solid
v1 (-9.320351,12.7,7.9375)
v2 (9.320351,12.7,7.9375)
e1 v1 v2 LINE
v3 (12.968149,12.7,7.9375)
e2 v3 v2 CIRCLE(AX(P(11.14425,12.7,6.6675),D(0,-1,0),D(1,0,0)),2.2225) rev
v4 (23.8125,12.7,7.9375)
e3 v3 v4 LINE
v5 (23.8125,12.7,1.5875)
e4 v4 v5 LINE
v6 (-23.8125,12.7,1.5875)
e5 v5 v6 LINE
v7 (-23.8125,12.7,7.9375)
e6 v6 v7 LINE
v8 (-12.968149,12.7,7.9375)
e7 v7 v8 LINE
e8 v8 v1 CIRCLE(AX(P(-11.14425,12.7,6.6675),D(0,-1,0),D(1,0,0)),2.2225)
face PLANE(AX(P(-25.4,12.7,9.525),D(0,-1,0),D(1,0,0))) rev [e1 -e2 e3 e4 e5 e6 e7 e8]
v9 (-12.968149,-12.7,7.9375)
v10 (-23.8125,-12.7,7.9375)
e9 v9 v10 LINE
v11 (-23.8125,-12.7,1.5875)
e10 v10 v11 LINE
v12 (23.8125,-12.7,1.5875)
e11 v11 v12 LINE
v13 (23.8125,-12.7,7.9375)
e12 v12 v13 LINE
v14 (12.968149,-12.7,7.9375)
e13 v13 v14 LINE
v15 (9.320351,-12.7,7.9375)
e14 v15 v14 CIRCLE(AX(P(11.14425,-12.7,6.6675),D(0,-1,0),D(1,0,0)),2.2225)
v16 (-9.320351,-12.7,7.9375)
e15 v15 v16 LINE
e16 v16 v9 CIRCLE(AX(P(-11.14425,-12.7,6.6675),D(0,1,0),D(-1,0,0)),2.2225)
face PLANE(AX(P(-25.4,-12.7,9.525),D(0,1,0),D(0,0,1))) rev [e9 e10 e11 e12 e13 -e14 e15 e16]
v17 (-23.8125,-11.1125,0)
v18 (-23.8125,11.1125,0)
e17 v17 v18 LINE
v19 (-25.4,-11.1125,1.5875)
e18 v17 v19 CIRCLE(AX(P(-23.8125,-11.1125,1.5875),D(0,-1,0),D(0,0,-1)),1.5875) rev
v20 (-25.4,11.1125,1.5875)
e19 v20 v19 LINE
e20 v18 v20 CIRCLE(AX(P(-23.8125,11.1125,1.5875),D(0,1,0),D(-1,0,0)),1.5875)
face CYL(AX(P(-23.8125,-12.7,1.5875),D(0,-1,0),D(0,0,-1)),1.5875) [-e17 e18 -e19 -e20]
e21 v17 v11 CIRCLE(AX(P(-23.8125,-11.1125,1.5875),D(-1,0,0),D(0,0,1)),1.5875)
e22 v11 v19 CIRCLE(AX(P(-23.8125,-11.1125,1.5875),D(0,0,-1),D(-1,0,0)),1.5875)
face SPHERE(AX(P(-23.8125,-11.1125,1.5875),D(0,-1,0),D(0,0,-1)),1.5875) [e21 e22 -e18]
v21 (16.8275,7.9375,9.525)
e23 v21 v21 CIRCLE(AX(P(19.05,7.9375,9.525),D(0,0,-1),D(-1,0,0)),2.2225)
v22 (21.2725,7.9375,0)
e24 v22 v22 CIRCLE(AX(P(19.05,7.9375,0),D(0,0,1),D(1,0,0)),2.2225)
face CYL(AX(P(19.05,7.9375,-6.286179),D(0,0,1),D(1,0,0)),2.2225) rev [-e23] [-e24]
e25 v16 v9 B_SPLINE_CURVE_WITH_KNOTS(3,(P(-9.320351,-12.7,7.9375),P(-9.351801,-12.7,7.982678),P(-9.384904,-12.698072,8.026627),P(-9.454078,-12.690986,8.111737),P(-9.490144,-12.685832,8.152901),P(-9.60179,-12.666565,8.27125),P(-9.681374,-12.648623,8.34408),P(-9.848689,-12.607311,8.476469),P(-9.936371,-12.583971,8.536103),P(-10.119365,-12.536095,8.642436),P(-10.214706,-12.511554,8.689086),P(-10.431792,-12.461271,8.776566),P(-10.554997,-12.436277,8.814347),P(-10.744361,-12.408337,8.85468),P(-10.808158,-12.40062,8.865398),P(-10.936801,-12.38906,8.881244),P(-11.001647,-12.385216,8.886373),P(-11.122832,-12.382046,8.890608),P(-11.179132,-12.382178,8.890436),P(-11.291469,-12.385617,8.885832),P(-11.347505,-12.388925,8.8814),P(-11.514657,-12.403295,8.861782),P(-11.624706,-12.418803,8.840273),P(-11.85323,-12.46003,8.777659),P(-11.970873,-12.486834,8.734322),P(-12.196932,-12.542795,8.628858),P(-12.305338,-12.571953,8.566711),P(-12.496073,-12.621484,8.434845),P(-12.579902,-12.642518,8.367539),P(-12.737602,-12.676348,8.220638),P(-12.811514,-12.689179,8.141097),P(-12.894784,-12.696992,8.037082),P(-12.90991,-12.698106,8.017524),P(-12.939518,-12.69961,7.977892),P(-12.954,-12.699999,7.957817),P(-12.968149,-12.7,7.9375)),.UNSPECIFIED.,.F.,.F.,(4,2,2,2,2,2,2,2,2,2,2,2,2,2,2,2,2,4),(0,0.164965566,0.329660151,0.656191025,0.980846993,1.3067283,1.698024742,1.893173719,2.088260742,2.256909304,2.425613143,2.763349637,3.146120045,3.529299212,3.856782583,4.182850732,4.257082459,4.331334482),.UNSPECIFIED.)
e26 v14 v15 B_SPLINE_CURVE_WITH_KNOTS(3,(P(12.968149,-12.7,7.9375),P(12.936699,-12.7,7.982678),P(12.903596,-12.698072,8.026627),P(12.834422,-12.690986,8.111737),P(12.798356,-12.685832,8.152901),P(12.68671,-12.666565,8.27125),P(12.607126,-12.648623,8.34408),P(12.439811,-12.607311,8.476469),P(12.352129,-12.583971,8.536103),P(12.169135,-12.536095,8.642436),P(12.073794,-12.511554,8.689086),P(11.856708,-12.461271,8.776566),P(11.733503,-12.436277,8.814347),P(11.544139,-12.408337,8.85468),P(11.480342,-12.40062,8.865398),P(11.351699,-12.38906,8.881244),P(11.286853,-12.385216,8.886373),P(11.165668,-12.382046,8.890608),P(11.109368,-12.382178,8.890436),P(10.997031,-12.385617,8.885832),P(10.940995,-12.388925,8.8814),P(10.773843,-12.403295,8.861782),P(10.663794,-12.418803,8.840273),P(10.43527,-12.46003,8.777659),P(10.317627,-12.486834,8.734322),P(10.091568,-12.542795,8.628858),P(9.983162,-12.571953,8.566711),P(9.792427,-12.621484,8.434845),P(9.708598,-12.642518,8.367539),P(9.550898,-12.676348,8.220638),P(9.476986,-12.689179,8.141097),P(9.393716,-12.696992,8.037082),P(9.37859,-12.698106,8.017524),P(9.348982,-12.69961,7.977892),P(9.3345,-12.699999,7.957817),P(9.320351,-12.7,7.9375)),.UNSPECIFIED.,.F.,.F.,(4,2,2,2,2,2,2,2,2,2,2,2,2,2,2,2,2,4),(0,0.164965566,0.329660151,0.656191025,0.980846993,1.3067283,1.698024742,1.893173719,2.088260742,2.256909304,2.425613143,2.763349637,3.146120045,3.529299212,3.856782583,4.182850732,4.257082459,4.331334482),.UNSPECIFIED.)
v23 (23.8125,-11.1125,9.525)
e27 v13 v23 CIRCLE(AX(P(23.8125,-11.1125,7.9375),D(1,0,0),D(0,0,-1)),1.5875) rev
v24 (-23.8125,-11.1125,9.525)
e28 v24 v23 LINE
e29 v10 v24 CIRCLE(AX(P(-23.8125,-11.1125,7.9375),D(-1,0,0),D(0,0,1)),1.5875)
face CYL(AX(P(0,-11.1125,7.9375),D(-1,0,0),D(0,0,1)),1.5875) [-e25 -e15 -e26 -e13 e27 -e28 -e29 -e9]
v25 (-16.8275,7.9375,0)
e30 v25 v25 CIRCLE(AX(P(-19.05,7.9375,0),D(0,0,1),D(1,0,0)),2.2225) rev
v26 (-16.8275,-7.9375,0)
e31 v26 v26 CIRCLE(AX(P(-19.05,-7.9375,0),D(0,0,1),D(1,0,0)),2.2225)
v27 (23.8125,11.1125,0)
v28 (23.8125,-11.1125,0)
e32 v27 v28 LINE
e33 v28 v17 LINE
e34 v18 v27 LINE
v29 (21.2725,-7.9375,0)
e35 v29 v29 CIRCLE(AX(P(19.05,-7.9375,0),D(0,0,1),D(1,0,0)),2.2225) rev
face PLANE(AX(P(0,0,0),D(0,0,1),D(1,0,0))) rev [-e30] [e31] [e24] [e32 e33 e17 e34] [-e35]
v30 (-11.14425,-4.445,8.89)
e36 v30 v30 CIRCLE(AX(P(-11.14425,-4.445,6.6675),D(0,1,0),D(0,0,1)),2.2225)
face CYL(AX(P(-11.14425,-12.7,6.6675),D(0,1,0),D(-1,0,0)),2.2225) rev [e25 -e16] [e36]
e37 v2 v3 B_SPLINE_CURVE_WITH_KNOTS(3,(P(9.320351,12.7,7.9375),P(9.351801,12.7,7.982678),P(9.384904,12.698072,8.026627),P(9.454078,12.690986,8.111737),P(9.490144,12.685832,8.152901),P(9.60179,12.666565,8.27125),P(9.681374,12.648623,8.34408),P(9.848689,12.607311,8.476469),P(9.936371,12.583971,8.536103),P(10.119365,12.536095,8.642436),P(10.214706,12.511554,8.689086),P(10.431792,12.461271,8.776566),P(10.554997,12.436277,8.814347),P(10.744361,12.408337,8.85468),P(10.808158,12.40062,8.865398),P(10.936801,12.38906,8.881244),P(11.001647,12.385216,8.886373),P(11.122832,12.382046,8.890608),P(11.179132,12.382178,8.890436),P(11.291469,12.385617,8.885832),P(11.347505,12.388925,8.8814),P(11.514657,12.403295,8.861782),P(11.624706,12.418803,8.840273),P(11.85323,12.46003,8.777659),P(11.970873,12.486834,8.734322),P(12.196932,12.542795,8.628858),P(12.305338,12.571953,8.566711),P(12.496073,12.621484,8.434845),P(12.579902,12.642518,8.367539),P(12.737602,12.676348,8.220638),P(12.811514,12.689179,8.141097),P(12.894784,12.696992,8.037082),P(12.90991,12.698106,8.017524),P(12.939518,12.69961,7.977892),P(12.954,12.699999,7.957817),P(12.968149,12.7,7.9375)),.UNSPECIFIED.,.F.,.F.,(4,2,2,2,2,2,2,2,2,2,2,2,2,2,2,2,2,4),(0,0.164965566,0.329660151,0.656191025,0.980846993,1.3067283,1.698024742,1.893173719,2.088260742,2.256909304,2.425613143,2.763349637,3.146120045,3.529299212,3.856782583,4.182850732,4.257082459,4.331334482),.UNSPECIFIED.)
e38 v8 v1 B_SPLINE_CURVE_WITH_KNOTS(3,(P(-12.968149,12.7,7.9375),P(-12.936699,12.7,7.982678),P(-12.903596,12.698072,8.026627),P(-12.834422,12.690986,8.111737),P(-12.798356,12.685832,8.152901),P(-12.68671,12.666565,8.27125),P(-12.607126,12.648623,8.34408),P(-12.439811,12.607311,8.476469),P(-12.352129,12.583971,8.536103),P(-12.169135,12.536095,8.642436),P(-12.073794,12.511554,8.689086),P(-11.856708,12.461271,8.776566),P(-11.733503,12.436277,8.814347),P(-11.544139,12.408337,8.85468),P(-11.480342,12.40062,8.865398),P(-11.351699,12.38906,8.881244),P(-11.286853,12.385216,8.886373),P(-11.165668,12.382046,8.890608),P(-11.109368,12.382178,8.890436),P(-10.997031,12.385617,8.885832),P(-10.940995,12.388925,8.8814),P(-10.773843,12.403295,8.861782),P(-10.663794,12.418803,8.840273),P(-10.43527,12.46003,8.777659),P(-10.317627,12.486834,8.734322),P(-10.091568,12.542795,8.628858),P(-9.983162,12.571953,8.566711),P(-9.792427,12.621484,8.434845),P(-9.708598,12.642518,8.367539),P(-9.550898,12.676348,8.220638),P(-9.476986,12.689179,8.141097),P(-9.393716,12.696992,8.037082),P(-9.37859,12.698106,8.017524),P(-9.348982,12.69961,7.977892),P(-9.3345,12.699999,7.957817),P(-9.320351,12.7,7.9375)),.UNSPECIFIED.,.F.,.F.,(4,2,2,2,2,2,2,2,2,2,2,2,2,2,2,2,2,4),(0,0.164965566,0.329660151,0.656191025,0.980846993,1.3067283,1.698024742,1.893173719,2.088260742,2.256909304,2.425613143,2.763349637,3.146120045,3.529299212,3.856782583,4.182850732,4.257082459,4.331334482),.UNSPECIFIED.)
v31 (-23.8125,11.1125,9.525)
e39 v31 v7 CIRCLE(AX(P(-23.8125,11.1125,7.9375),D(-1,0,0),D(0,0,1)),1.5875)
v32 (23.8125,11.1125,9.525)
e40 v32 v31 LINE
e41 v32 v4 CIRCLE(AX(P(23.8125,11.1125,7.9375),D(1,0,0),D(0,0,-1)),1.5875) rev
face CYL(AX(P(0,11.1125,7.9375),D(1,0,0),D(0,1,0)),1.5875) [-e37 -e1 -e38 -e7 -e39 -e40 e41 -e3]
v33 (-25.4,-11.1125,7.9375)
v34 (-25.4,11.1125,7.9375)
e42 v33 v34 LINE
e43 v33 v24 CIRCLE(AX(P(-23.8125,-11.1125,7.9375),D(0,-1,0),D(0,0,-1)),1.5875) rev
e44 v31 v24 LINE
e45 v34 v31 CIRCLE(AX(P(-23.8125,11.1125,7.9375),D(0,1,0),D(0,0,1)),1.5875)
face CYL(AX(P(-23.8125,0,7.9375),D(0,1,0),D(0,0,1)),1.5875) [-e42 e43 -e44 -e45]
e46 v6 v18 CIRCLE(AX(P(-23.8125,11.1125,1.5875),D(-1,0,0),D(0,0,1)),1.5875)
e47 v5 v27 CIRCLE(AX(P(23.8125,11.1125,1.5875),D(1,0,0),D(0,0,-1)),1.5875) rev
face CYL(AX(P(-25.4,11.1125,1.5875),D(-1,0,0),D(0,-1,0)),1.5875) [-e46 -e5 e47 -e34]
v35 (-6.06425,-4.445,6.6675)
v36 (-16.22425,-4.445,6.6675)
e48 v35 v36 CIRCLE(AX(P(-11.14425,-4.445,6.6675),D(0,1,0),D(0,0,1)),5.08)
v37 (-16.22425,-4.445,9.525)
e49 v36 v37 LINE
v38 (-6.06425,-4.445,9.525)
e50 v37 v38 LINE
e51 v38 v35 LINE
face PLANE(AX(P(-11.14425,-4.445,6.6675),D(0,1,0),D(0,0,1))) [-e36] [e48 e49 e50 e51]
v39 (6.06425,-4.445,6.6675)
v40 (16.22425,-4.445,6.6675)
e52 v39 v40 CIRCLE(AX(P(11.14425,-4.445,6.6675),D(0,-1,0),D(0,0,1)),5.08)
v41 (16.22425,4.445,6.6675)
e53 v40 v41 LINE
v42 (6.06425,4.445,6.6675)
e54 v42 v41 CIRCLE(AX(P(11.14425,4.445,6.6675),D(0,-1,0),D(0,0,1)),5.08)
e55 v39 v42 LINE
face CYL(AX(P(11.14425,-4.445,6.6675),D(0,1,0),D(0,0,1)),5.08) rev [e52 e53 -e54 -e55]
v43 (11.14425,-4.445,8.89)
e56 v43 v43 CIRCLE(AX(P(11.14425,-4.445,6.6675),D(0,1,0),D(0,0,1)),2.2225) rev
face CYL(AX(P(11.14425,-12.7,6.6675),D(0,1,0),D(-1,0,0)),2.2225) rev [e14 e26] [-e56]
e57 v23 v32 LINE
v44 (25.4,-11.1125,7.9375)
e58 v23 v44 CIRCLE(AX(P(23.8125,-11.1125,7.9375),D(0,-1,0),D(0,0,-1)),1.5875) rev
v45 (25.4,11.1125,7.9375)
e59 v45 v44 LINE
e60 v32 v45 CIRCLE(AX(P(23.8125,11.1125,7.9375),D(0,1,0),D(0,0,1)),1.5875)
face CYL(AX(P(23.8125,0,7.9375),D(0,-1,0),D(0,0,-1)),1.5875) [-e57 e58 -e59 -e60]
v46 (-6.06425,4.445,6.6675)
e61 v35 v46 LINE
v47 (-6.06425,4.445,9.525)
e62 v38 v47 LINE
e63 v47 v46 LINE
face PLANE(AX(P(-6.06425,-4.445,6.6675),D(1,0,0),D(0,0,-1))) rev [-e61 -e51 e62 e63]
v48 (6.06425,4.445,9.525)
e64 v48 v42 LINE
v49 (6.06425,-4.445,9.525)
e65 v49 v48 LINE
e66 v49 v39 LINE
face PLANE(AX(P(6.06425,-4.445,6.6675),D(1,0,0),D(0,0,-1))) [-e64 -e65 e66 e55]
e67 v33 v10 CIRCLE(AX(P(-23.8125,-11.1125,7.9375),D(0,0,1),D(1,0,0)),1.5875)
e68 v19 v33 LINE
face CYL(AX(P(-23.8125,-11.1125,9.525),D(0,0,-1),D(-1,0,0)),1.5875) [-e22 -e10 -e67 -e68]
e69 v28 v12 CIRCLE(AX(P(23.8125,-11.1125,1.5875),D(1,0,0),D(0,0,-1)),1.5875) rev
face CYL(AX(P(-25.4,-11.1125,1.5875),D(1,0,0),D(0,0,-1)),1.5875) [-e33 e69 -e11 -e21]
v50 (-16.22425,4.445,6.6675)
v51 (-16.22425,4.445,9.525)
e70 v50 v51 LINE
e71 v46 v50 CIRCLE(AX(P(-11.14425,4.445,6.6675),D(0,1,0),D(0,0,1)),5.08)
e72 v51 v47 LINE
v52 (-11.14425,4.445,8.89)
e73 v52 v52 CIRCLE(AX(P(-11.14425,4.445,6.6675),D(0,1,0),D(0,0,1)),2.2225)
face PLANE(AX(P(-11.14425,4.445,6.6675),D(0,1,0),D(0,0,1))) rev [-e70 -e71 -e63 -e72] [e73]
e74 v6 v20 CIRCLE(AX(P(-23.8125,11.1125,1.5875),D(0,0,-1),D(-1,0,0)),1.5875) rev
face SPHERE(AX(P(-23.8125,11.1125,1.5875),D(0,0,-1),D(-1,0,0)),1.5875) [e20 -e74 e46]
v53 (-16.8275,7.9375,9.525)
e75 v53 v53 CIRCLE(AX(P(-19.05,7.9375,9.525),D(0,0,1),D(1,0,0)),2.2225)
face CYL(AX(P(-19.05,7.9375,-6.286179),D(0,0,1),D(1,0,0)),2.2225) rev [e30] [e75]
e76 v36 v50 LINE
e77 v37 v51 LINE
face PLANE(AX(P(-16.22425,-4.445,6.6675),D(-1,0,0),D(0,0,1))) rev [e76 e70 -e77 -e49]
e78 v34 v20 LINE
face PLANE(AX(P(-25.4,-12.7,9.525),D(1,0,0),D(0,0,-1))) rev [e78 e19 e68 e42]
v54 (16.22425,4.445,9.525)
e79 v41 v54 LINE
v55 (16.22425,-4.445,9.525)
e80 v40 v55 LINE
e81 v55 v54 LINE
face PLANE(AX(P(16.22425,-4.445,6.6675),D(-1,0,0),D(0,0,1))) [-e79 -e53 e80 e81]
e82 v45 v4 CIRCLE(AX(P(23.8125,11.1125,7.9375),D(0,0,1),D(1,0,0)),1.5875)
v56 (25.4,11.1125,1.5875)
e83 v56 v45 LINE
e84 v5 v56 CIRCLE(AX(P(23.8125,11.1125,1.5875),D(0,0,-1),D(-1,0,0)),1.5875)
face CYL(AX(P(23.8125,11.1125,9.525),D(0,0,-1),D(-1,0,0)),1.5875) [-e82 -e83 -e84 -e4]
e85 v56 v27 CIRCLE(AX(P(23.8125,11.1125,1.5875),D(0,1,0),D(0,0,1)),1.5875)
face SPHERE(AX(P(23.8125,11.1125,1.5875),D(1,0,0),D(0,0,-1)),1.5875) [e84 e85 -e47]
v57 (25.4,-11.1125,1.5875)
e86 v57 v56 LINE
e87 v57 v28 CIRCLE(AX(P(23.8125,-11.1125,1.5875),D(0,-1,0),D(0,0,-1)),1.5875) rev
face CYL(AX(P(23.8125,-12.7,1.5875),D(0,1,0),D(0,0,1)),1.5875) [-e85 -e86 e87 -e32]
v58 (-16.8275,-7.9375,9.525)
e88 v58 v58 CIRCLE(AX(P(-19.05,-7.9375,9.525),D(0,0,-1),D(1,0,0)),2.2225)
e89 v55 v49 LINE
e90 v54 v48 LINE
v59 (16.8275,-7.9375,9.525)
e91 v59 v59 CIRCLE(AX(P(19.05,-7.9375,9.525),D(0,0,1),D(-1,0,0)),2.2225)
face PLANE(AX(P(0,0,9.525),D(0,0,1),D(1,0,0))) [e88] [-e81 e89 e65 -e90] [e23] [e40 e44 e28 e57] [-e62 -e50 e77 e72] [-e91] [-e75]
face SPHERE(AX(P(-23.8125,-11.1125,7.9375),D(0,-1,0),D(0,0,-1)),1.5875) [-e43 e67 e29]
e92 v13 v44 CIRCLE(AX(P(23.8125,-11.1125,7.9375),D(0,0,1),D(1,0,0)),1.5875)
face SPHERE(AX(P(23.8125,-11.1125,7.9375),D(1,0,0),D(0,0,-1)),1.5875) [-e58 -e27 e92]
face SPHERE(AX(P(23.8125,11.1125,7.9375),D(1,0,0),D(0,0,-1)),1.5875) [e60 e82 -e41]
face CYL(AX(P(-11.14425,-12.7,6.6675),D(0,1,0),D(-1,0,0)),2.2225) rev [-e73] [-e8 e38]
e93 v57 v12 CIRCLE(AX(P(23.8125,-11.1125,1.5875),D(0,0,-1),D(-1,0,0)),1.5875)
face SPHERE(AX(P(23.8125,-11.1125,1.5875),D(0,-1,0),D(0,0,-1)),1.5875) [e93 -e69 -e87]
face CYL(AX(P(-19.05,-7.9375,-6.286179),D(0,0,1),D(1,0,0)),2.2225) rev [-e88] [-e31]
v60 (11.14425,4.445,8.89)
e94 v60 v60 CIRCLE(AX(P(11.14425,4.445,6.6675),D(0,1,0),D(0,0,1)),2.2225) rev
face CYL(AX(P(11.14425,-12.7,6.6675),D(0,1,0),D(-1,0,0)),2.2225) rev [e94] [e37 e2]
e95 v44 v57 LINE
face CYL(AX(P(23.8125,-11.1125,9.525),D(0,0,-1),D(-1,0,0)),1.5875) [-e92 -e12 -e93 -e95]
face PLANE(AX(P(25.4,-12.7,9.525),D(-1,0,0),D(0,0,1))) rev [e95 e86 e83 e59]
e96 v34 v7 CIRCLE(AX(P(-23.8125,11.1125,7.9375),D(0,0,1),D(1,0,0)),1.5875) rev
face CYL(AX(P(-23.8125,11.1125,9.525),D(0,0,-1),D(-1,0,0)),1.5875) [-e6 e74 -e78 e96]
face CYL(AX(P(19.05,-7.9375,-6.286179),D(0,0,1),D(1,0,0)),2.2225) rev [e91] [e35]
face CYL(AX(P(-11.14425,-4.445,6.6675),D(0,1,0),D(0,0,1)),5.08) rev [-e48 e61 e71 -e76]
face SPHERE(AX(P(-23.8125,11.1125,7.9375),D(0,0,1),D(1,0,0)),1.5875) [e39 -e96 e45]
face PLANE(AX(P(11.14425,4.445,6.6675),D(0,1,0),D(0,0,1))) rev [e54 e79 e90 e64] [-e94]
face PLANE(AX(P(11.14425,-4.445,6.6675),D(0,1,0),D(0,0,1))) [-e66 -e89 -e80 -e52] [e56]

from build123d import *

# Parameters (mm, degrees)
SKETCH1_W               = 50.8
SKETCH1_H               = 25.4
BOSS_EXTRUDE1_DEPTH     = 9.525
CUT_EXTRUDE2_DEPTH      = 4.445
SKETCH2_R               = 2.2225
CUT_EXTRUDE1_DEPTH      = 9.525
CUT_EXTRUDE3_START      = -38.162422217
SKETCH5_R               = 2.2225
CUT_EXTRUDE3_DEPTH      = 41.337422217
MIRROR2_COPY_1_SKETCH_R = 2.2225
MIRROR2_COPY_1_DEPTH    = 9.525
FILLET1_R               = 1.5875


with BuildPart() as part:
    # Sketch1 → Boss-Extrude1 (new body)
    with BuildSketch(Plane.XY):
        Rectangle(SKETCH1_W, SKETCH1_H)
    extrude(amount=BOSS_EXTRUDE1_DEPTH)

    # Sketch4 → Cut-Extrude2 (cut, symmetric)
    with BuildSketch(Plane(origin=(0, 0, 0), x_dir=(1, 0, 0), z_dir=(0, 1, 0))):
        with BuildLine():
            Line((-16.22425, -6.6675), (-16.22425, -9.525))
            Line((-16.22425, -9.525), (-6.06425, -9.525))
            Line((-6.06425, -9.525), (-6.06425, -6.6675))
            ThreePointArc((-6.06425, -6.6675), (-11.14425, -1.5875), (-16.22425, -6.6675))
        make_face()
    cut_extrude2 = extrude(amount=CUT_EXTRUDE2_DEPTH, both=True, mode=Mode.SUBTRACT)

    # Sketch2 → Cut-Extrude1 (cut)
    with BuildSketch(Plane.XY.offset(9.525)):
        with Locations((-19.05, 7.9375)):
            Circle(SKETCH2_R)
    cut_extrude1 = extrude(amount=-CUT_EXTRUDE1_DEPTH, mode=Mode.SUBTRACT)

    # Sketch5 → Cut-Extrude3 (cut)
    with BuildSketch(Plane(origin=(0, 12.7, 0), x_dir=(1, 0, 0), z_dir=(0, 1, 0)).offset(CUT_EXTRUDE3_START)):
        with Locations(Location((-11.14425, -6.6675, 0), (0, 0, 180))):
            Circle(SKETCH5_R)
    cut_extrude3 = extrude(amount=CUT_EXTRUDE3_DEPTH, mode=Mode.SUBTRACT)

    # Mirror1: Cut-Extrude1 across plane
    add(cut_extrude1.mirror(Plane.ZX), mode=Mode.SUBTRACT)

    # Mirror2: Cut-Extrude2, Cut-Extrude1, Cut-Extrude3 across plane
    add(cut_extrude2.mirror(Plane.ZY), mode=Mode.SUBTRACT)
    add(cut_extrude1.mirror(Plane.ZY), mode=Mode.SUBTRACT)
    add(cut_extrude3.mirror(Plane.ZY), mode=Mode.SUBTRACT)

    # Mirror2 copy 1 sketch → Mirror2 copy 1 (cut)
    with BuildSketch(Plane(origin=(0, 0, 9.525), x_dir=(-1, 0, 0), z_dir=(0, 0, 1))):
        with Locations((-19.05, 7.9375)):
            Circle(MIRROR2_COPY_1_SKETCH_R)
    extrude(amount=-MIRROR2_COPY_1_DEPTH, mode=Mode.SUBTRACT)

    # Fillet1
    # the kernel refuses this fillet: 1.5875 mm, written as the material it takes off along each edge
    with BuildSketch(Plane(origin=(-23.8125, 11.1125, 7.9375), x_dir=(0, 1, 0), z_dir=(-1, 0, 0))) as fillet1_piece_1_section:
        Polygon((0, 0), (FILLET1_R, 0), (FILLET1_R, -FILLET1_R), (0, -FILLET1_R), align=None)
    fillet1_piece_1 = extrude(amount=FILLET1_R, mode=Mode.PRIVATE)
    fillet1_piece_1 = fillet1_piece_1 - Plane(origin=(-23.8125, 11.1125, 7.9375), x_dir=(0, -0.7071067811865475, -0.7071067811865475), z_dir=(-1, 0, 0)) * Sphere(FILLET1_R, mode=Mode.PRIVATE)
    add(fillet1_piece_1, mode=Mode.SUBTRACT)
    with BuildSketch(Plane(origin=(23.8125, 11.1125, 7.9375), x_dir=(0, 0, 1), z_dir=(0, 1, 0))) as fillet1_piece_2_section:
        Polygon((0, 0), (FILLET1_R, 0), (FILLET1_R, FILLET1_R), (0, FILLET1_R), align=None)
    fillet1_piece_2 = extrude(amount=FILLET1_R, mode=Mode.PRIVATE)
    fillet1_piece_2 = fillet1_piece_2 - Plane(origin=(23.8125, 11.1125, 7.9375), x_dir=(-0.7071067811865475, 0, -0.7071067811865475), z_dir=(0, 1, 0)) * Sphere(FILLET1_R, mode=Mode.PRIVATE)
    add(fillet1_piece_2, mode=Mode.SUBTRACT)
    with BuildSketch(Plane(origin=(-23.8125, -11.1125, 7.9375), x_dir=(0, -1, 0), z_dir=(-1, 0, 0))) as fillet1_piece_3_section:
        Polygon((0, 0), (FILLET1_R, 0), (FILLET1_R, FILLET1_R), (0, FILLET1_R), align=None)
    fillet1_piece_3 = extrude(amount=FILLET1_R, mode=Mode.PRIVATE)
    fillet1_piece_3 = fillet1_piece_3 - Plane(origin=(-23.8125, -11.1125, 7.9375), x_dir=(0, 0.7071067811865475, -0.7071067811865475), z_dir=(-1, 0, 0)) * Sphere(FILLET1_R, mode=Mode.PRIVATE)
    add(fillet1_piece_3, mode=Mode.SUBTRACT)
    with BuildSketch(Plane(origin=(23.8125, -11.1125, 7.9375), x_dir=(0, 0, 1), z_dir=(0, -1, 0))) as fillet1_piece_4_section:
        Polygon((0, 0), (FILLET1_R, 0), (FILLET1_R, -FILLET1_R), (0, -FILLET1_R), align=None)
    fillet1_piece_4 = extrude(amount=FILLET1_R, mode=Mode.PRIVATE)
    fillet1_piece_4 = fillet1_piece_4 - Plane(origin=(23.8125, -11.1125, 7.9375), x_dir=(-0.7071067811865475, 0, -0.7071067811865475), z_dir=(0, -1, 0)) * Sphere(FILLET1_R, mode=Mode.PRIVATE)
    add(fillet1_piece_4, mode=Mode.SUBTRACT)
    with BuildSketch(Plane(origin=(-23.8125, -11.1125, 1.5875), x_dir=(0, -1, 0), z_dir=(-1, 0, 0))) as fillet1_piece_5_section:
        Polygon((0, 0), (FILLET1_R, 0), (FILLET1_R, -FILLET1_R), (0, -FILLET1_R), align=None)
    fillet1_piece_5 = extrude(amount=FILLET1_R, mode=Mode.PRIVATE)
    fillet1_piece_5 = fillet1_piece_5 - Plane(origin=(-23.8125, -11.1125, 1.5875), x_dir=(0, 0.7071067811865475, 0.7071067811865475), z_dir=(-1, 0, 0)) * Sphere(FILLET1_R, mode=Mode.PRIVATE)
    add(fillet1_piece_5, mode=Mode.SUBTRACT)
    with BuildSketch(Plane(origin=(-23.8125, 11.1125, 1.5875), x_dir=(0, 1, 0), z_dir=(-1, 0, 0))) as fillet1_piece_6_section:
        Polygon((0, 0), (FILLET1_R, 0), (FILLET1_R, FILLET1_R), (0, FILLET1_R), align=None)
    fillet1_piece_6 = extrude(amount=FILLET1_R, mode=Mode.PRIVATE)
    fillet1_piece_6 = fillet1_piece_6 - Plane(origin=(-23.8125, 11.1125, 1.5875), x_dir=(0, -0.7071067811865475, 0.7071067811865475), z_dir=(-1, 0, 0)) * Sphere(FILLET1_R, mode=Mode.PRIVATE)
    add(fillet1_piece_6, mode=Mode.SUBTRACT)
    with BuildSketch(Plane(origin=(23.8125, 11.1125, 1.5875), x_dir=(0, 0, -1), z_dir=(0, 1, 0))) as fillet1_piece_7_section:
        Polygon((0, 0), (FILLET1_R, 0), (FILLET1_R, -FILLET1_R), (0, -FILLET1_R), align=None)
    fillet1_piece_7 = extrude(amount=FILLET1_R, mode=Mode.PRIVATE)
    fillet1_piece_7 = fillet1_piece_7 - Plane(origin=(23.8125, 11.1125, 1.5875), x_dir=(-0.7071067811865475, 0, 0.7071067811865475), z_dir=(0, 1, 0)) * Sphere(FILLET1_R, mode=Mode.PRIVATE)
    add(fillet1_piece_7, mode=Mode.SUBTRACT)
    with BuildSketch(Plane(origin=(23.8125, -11.1125, 1.5875), x_dir=(0, 0, -1), z_dir=(0, -1, 0))) as fillet1_piece_8_section:
        Polygon((0, 0), (FILLET1_R, 0), (FILLET1_R, FILLET1_R), (0, FILLET1_R), align=None)
    fillet1_piece_8 = extrude(amount=FILLET1_R, mode=Mode.PRIVATE)
    fillet1_piece_8 = fillet1_piece_8 - Plane(origin=(23.8125, -11.1125, 1.5875), x_dir=(-0.7071067811865475, 0, 0.7071067811865475), z_dir=(0, -1, 0)) * Sphere(FILLET1_R, mode=Mode.PRIVATE)
    add(fillet1_piece_8, mode=Mode.SUBTRACT)
    with BuildSketch(Plane(origin=(-23.8125, 12.7, 9.525), x_dir=(0, 0, -1), z_dir=(1, 0, 0)), Plane(origin=(23.8125, -12.7, 9.525), x_dir=(0, 0, -1), z_dir=(-1, 0, 0))) as fillet1_piece_9:
        with BuildLine():
            CenterArc((FILLET1_R, -FILLET1_R), FILLET1_R, 90, 90)
            Line((0, -FILLET1_R), (0, 0))
            Line((0, 0), (FILLET1_R, 0))
        make_face()
    extrude(amount=47.625, mode=Mode.SUBTRACT)
    with BuildSketch(Plane(origin=(-25.4, -11.1125, 9.525), x_dir=(0, 0, -1), z_dir=(0, 1, 0)), Plane(origin=(25.4, 11.1125, 0), x_dir=(-1, 0, 0), z_dir=(0, -1, 0))) as fillet1_piece_10:
        with BuildLine():
            CenterArc((FILLET1_R, -FILLET1_R), FILLET1_R, 90, 90)
            Line((0, -FILLET1_R), (0, 0))
            Line((0, 0), (FILLET1_R, 0))
        make_face()
    extrude(amount=22.225, mode=Mode.SUBTRACT)
    with BuildSketch(Plane(origin=(-25.4, -11.1125, 0), x_dir=(0, 0, 1), z_dir=(0, 1, 0)), Plane(origin=(25.4, 11.1125, 9.525), x_dir=(-1, 0, 0), z_dir=(0, -1, 0))) as fillet1_piece_11:
        with BuildLine():
            CenterArc((FILLET1_R, FILLET1_R), FILLET1_R, 180, 90)
            Line((0, FILLET1_R), (0, 0))
            Line((0, 0), (FILLET1_R, 0))
        make_face()
    extrude(amount=22.225, mode=Mode.SUBTRACT)
    with BuildSketch(Plane(origin=(-23.8125, 12.7, 0), x_dir=(0, 0, 1), z_dir=(1, 0, 0)), Plane(origin=(23.8125, -12.7, 0), x_dir=(0, 0, 1), z_dir=(-1, 0, 0))) as fillet1_piece_12:
        with BuildLine():
            CenterArc((FILLET1_R, FILLET1_R), FILLET1_R, 180, 90)
            Line((0, FILLET1_R), (0, 0))
            Line((0, 0), (FILLET1_R, 0))
        make_face()
    extrude(amount=47.625, mode=Mode.SUBTRACT)
    with BuildSketch(Plane(origin=(-25.4, -12.7, 1.5875), x_dir=(0, 1, 0), z_dir=(0, 0, 1)), Plane(origin=(25.4, -12.7, 1.5875), x_dir=(-1, 0, 0), z_dir=(0, 0, 1))) as fillet1_piece_13:
        with BuildLine():
            CenterArc((FILLET1_R, -FILLET1_R), FILLET1_R, 90, 90)
            Line((0, -FILLET1_R), (0, 0))
            Line((0, 0), (FILLET1_R, 0))
        make_face()
    extrude(amount=6.35, mode=Mode.SUBTRACT)
    with BuildSketch(Plane(origin=(-25.4, 12.7, 1.5875), x_dir=(0, -1, 0), z_dir=(0, 0, 1)), Plane(origin=(25.4, 12.7, 1.5875), x_dir=(-1, 0, 0), z_dir=(0, 0, 1))) as fillet1_piece_14:
        with BuildLine():
            CenterArc((FILLET1_R, FILLET1_R), FILLET1_R, 180, 90)
            Line((0, FILLET1_R), (0, 0))
            Line((0, 0), (FILLET1_R, 0))
        make_face()
    extrude(amount=6.35, mode=Mode.SUBTRACT)


solid = part.part
